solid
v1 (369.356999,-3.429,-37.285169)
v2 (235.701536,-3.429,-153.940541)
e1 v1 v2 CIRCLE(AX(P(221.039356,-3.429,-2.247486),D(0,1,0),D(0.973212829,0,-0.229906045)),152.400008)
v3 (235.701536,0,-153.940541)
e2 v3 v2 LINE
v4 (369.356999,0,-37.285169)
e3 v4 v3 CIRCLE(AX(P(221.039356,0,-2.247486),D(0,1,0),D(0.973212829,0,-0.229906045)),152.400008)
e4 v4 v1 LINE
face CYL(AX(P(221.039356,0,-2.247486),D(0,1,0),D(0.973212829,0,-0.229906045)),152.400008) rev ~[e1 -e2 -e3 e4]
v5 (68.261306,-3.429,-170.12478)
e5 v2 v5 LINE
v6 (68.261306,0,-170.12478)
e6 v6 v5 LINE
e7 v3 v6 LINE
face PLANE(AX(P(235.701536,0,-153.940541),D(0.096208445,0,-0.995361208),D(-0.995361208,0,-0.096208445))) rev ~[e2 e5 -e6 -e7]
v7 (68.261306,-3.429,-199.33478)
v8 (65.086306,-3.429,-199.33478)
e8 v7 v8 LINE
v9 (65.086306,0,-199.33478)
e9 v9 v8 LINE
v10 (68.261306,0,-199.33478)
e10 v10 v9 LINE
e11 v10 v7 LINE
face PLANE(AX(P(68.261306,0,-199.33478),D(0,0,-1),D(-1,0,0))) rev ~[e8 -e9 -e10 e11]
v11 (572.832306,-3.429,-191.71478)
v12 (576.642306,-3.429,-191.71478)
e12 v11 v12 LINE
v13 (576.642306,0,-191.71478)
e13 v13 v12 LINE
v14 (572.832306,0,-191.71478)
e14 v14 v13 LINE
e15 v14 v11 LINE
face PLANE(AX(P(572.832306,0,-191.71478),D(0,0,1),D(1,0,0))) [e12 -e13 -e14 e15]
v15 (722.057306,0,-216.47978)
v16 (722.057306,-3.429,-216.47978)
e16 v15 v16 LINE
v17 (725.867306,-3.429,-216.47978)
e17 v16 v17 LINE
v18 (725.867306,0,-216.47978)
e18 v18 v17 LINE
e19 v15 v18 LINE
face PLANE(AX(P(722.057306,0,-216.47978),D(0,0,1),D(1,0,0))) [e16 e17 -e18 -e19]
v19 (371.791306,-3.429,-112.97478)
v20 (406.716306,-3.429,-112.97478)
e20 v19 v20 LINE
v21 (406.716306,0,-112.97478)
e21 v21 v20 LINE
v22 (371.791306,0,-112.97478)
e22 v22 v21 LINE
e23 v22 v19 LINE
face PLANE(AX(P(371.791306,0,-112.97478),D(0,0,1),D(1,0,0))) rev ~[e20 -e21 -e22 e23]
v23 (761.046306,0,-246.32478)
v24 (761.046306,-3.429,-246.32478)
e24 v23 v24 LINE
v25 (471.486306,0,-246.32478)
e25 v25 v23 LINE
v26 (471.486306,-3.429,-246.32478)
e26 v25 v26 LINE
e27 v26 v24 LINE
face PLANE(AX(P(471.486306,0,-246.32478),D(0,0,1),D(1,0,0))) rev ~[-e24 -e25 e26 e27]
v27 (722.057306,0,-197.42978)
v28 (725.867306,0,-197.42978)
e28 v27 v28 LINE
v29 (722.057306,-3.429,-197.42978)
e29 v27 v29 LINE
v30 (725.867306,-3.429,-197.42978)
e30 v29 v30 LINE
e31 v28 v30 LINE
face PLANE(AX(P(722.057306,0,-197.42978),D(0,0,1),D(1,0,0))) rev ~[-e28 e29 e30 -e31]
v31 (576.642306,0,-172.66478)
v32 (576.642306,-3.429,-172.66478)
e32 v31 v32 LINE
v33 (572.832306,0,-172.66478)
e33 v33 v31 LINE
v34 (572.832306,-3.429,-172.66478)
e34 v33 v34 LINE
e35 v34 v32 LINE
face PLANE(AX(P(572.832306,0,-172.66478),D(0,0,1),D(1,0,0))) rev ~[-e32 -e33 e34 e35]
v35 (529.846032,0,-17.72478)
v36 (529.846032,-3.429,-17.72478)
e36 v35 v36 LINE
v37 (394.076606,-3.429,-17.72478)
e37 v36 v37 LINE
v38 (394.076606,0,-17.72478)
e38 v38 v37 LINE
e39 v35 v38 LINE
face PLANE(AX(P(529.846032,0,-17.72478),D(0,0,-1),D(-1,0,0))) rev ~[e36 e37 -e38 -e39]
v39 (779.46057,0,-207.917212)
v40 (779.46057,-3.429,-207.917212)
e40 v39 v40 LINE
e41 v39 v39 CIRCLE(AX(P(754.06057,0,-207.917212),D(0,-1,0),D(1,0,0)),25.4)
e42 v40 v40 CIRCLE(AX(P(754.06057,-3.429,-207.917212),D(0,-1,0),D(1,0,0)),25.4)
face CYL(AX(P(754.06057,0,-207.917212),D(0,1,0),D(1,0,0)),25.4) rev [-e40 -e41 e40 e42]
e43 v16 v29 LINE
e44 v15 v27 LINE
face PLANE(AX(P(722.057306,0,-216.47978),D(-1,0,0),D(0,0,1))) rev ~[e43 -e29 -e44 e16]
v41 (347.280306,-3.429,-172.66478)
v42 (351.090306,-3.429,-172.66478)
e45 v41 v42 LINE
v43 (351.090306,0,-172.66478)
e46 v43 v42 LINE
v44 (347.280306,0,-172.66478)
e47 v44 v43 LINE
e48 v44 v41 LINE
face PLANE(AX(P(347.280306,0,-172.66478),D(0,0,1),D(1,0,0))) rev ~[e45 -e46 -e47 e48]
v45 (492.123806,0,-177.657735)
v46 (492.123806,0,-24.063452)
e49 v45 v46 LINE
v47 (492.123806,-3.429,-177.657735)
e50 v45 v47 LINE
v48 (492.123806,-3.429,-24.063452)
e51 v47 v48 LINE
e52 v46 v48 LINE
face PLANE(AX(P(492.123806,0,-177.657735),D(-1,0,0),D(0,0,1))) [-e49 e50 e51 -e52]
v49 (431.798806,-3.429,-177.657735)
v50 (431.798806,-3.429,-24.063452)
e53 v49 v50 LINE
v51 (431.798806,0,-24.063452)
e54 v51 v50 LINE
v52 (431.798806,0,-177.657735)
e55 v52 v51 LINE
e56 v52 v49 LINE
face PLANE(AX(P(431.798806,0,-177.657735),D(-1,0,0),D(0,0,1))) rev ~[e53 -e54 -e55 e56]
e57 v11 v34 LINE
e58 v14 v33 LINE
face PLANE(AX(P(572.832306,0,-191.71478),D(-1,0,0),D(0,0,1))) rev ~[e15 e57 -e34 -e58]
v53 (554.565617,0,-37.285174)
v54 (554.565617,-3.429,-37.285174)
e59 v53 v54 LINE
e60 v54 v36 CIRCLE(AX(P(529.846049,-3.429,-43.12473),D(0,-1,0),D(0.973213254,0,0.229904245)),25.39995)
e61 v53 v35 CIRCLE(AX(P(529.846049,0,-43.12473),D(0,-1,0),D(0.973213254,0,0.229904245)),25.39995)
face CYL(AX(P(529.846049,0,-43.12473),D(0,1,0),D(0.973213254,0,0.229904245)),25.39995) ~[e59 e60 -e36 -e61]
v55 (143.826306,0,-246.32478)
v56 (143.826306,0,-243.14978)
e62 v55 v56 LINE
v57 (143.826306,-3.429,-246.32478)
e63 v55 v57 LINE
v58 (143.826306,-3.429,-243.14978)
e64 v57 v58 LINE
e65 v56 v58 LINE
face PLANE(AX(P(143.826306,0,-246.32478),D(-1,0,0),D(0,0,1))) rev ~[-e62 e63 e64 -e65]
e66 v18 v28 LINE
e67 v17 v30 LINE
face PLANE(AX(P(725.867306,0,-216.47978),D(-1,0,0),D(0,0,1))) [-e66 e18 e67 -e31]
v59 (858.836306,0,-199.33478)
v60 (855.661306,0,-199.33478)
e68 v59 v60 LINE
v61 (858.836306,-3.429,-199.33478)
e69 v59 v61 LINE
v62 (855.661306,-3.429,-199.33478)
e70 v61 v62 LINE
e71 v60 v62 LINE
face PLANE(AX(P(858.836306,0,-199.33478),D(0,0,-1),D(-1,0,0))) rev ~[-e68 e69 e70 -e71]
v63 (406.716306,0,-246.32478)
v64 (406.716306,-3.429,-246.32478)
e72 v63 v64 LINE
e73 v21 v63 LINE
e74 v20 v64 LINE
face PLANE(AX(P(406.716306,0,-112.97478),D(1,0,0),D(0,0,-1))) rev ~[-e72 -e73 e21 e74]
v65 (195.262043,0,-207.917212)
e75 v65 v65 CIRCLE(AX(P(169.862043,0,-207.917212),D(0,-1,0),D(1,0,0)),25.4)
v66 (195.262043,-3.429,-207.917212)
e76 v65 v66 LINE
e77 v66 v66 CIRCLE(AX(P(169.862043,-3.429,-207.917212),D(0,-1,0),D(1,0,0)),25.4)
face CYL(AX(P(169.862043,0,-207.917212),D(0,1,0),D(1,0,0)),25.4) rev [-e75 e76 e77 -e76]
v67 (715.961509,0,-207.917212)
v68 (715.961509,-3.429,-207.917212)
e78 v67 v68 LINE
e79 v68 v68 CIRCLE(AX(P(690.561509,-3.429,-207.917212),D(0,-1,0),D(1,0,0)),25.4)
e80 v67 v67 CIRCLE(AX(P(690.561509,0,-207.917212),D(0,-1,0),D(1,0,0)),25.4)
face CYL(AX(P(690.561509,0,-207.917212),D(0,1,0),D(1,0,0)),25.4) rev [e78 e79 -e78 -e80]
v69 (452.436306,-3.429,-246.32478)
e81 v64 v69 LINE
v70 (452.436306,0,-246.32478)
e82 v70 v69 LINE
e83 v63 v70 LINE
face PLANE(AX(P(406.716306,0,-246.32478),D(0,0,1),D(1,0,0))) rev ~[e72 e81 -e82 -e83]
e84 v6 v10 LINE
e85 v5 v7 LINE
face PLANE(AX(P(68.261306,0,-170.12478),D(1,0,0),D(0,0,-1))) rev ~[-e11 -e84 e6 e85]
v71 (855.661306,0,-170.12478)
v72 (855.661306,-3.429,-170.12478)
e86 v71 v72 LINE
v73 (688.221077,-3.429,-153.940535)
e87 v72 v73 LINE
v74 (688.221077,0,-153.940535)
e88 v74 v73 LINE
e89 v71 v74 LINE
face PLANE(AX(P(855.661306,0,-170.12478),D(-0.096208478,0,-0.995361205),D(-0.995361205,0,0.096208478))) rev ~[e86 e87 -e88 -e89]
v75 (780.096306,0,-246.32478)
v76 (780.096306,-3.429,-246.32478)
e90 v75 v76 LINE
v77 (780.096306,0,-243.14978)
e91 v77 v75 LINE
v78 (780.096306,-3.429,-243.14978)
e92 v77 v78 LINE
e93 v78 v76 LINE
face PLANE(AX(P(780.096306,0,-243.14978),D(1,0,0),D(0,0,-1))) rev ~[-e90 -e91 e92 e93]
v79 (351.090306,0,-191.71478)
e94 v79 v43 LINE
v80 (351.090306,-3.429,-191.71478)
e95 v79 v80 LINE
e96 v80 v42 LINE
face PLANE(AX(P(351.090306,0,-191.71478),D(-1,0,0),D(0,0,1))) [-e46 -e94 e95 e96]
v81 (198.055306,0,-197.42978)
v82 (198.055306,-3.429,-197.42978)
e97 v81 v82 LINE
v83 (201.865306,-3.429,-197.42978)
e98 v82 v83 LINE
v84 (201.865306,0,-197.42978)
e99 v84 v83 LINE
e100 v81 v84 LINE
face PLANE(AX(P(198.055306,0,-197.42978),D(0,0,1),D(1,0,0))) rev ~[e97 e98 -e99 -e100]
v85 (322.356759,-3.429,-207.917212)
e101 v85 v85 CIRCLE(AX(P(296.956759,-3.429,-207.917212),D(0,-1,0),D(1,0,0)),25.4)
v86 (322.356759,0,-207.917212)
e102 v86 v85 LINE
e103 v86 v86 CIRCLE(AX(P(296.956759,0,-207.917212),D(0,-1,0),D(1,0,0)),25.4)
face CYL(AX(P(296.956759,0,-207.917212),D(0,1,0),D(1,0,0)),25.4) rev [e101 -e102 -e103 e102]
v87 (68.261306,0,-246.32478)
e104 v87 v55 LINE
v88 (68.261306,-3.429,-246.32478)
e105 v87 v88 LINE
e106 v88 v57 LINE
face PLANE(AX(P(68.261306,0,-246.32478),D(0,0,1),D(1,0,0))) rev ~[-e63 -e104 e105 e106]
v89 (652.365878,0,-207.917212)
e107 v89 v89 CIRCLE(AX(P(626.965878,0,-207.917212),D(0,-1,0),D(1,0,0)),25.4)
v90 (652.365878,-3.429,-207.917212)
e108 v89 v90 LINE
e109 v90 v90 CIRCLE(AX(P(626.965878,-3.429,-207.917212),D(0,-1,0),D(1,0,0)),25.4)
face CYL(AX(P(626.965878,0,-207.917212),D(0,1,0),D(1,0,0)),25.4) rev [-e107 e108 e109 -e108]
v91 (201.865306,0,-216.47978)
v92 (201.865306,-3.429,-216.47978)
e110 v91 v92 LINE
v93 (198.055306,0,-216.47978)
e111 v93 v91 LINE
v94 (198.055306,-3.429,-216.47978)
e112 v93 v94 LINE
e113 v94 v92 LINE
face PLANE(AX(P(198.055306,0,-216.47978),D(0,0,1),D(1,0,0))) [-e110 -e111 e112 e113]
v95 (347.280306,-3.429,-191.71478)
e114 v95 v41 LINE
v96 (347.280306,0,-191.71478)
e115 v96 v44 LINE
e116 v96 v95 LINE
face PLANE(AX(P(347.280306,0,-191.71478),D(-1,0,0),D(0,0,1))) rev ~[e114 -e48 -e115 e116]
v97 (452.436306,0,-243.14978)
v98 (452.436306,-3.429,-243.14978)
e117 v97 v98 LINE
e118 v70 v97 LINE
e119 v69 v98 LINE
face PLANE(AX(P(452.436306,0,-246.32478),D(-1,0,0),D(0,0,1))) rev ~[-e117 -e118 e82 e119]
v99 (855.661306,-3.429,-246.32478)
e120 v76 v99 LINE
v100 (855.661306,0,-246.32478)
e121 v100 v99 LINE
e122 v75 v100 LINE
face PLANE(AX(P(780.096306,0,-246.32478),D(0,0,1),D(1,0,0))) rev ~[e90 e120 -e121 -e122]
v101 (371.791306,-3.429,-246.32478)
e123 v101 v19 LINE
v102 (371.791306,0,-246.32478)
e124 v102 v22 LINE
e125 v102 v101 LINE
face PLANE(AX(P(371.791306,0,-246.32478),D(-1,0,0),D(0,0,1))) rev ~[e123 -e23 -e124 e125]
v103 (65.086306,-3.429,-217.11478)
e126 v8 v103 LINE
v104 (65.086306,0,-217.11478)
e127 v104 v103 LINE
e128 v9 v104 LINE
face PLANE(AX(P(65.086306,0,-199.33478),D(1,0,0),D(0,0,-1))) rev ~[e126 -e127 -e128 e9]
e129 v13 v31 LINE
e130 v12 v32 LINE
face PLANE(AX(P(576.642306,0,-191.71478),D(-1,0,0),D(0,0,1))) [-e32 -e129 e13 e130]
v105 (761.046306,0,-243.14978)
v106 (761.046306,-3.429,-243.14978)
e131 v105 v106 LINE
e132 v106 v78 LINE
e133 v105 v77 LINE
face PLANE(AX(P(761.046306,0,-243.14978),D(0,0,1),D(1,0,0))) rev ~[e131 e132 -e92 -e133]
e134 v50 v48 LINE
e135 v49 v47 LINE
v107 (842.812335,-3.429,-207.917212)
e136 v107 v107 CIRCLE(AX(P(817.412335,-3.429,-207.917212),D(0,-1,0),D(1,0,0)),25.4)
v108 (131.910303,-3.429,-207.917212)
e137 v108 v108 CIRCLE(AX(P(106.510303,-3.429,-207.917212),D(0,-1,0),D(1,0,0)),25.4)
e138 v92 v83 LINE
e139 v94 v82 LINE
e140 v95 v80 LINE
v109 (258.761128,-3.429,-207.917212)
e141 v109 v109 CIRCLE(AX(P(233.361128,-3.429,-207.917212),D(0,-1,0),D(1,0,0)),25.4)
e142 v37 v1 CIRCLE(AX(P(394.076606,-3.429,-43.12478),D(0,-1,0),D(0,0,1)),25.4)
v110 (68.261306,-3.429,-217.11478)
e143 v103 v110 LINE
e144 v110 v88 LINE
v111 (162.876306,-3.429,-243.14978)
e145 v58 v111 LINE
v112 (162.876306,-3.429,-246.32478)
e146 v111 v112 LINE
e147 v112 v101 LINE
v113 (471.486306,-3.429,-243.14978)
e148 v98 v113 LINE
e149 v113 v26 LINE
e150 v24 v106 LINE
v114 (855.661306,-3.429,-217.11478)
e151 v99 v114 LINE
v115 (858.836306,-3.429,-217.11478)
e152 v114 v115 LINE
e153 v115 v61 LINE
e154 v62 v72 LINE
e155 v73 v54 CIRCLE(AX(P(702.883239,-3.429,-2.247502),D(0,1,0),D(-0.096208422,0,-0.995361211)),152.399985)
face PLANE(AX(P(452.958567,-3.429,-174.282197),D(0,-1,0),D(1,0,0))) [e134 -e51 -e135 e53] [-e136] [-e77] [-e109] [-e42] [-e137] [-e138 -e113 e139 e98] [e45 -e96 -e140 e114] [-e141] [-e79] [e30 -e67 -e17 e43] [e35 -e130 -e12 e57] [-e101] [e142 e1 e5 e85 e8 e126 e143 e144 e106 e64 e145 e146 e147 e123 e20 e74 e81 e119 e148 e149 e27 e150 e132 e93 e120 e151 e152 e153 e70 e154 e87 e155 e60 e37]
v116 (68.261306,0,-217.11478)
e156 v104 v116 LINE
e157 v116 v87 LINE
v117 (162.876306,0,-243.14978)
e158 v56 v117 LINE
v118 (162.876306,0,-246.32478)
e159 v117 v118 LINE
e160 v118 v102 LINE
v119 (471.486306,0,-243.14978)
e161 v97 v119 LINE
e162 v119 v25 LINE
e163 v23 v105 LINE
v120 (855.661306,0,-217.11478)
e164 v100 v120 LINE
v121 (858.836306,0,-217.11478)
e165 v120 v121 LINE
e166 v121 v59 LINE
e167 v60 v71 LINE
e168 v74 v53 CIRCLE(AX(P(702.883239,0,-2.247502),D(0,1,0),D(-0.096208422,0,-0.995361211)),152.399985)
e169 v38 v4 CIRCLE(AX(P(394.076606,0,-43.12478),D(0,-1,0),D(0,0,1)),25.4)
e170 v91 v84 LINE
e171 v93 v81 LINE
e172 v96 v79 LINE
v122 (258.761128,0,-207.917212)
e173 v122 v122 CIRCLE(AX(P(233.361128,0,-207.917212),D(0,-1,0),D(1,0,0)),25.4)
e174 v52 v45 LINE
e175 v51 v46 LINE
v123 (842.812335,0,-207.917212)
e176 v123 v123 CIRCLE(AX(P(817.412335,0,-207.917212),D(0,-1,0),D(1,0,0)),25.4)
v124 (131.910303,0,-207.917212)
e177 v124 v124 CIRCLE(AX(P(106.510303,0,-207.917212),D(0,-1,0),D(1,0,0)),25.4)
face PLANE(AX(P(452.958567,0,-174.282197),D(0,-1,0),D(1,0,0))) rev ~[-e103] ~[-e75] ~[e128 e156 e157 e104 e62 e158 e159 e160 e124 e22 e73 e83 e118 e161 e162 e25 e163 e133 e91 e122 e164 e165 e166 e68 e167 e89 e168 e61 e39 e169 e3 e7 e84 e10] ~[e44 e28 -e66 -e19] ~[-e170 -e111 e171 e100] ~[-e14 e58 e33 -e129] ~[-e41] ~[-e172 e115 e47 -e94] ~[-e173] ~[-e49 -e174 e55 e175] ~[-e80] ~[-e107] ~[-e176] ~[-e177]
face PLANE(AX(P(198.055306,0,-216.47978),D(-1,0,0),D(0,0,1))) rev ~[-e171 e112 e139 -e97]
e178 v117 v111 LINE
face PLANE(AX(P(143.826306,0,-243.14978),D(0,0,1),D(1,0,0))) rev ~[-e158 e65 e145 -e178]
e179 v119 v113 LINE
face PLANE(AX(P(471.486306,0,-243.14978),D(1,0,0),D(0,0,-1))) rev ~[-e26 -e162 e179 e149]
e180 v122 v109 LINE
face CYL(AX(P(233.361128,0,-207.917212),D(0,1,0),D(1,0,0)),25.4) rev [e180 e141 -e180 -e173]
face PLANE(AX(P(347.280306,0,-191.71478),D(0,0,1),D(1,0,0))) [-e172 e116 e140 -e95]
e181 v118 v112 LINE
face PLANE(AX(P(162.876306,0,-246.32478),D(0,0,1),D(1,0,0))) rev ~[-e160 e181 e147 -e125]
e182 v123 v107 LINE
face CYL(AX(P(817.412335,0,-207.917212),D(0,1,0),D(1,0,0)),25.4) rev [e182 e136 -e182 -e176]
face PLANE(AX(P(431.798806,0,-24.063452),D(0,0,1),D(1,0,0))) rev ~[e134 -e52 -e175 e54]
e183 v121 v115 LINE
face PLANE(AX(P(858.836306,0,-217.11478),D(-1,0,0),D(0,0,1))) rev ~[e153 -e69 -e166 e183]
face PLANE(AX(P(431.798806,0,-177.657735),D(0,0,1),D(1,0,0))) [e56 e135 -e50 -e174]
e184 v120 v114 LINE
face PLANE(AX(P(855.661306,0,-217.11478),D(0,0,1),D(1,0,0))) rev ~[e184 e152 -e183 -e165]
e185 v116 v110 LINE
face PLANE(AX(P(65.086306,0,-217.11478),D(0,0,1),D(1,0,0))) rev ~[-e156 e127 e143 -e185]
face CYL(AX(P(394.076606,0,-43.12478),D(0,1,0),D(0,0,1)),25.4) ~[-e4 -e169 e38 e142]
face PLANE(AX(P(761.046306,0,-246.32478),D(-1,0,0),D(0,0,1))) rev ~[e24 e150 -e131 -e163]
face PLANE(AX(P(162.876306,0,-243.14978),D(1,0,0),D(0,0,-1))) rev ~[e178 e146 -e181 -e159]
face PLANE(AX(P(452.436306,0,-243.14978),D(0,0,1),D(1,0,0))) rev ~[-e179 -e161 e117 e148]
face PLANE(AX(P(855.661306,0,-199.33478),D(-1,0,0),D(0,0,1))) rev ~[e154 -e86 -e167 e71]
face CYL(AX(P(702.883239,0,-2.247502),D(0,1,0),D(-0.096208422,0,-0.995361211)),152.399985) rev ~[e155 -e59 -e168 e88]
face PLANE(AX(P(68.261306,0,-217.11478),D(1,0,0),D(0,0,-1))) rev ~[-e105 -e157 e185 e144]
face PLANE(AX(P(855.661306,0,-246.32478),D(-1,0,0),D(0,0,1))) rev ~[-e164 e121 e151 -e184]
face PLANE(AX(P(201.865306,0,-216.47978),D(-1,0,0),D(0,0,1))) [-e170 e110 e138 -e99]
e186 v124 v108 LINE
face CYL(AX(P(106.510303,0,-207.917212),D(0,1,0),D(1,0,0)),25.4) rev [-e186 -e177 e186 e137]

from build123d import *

# Parameters (mm, degrees)
F0_R     = 25.4
F0_W     = 3.81
F0_H     = 19.05
F0_W_2   = 60.325
F0_H_2   = 153.5942826
F1_DEPTH = 3.429


# Not quite as in the source:
# - ends of sketch curves that miss each other by under 0.0002 mm in the source are joined


with BuildPart() as f1:
    # F0 (on Front) → F1 (new body)
    with BuildSketch(Plane.XZ):
        with BuildLine():
            Line((68.2613062, -217.1147804), (68.2613062, -246.3247804))
            Line((68.2613062, -246.3247804), (143.8263062, -246.3247804))
            Line((143.8263062, -246.3247804), (143.8263062, -243.1497804))
            Line((143.8263062, -243.1497804), (162.8763062, -243.1497804))
            Line((162.8763062, -243.1497804), (162.8763062, -246.3247804))
            Line((162.8763062, -246.3247804), (371.7913062, -246.3247804))
            Line((371.7913062, -246.3247804), (371.7913062, -112.9747804))
            Line((371.7913062, -112.9747804), (406.7163062, -112.9747804))
            Line((406.7163062, -112.9747804), (406.7163062, -246.3247804))
            Line((406.7163062, -246.3247804), (452.4363062, -246.3247804))
            Line((452.4363062, -246.3247804), (452.4363062, -243.1497804))
            Line((452.4363062, -243.1497804), (471.4863062, -243.1497804))
            Line((471.4863062, -243.1497804), (471.4863062, -246.3247804))
            Line((471.4863062, -246.3247804), (761.0463062, -246.3247804))
            Line((761.0463062, -246.3247804), (761.0463062, -243.1497804))
            Line((761.0463062, -243.1497804), (780.0963062, -243.1497804))
            Line((780.0963062, -243.1497804), (780.0963062, -246.3247804))
            Line((780.0963062, -246.3247804), (855.6613062, -246.3247804))
            Line((855.6613062, -246.3247804), (855.6613062, -217.1147804))
            Line((855.6613062, -217.1147804), (858.8363062, -217.1147804))
            Line((858.8363062, -217.1147804), (858.8363062, -199.3347804))
            Line((858.8363062, -199.3347804), (855.6613062, -199.3347804))
            Line((855.6613062, -199.3347804), (855.6613062, -170.1247804))
            Line((855.6613062, -170.1247804), (688.2210772, -153.9405354))
            ThreePointArc((688.2210772, -153.9405354), (602.6698633523, -117.0648991424), (554.5656172379, -37.2851738969))
            ThreePointArc((554.5656172379, -37.2851738969), (545.6072798598, -23.2063701747), (529.846032, -17.7247804))
            Line((529.846032, -17.7247804), (394.0766058, -17.7247804))
            ThreePointArc((394.0766058, -17.7247804), (378.3153579402, -23.2063701747), (369.3569994588, -37.2851689116))
            ThreePointArc((369.3569994588, -37.2851689116), (321.2527512475, -117.0648972224), (235.7015357309, -153.9405408928))
            Line((235.7015357309, -153.9405408928), (68.2613062, -170.1247804))
            Line((68.2613062, -170.1247804), (68.2613062, -199.3347804))
            Line((68.2613062, -199.3347804), (65.0863062, -199.3347804))
            Line((65.0863062, -199.3347804), (65.0863062, -217.1147804))
            Line((65.0863062, -217.1147804), (68.2613062, -217.1147804))
        make_face()
        with Locations((106.5103026, -207.9172118)):
            Circle(F0_R, mode=Mode.SUBTRACT)
        with Locations((169.8620428, -207.9172118)):
            Circle(F0_R, mode=Mode.SUBTRACT)
        with Locations((199.9603062, -206.9547804)):
            Rectangle(F0_W, F0_H, mode=Mode.SUBTRACT)
        with Locations((233.3611284, -207.9172118)):
            Circle(F0_R, mode=Mode.SUBTRACT)
        with Locations((296.9567594, -207.9172118)):
            Circle(F0_R, mode=Mode.SUBTRACT)
        with Locations((349.1853062, -182.1897804)):
            Rectangle(F0_W, F0_H, mode=Mode.SUBTRACT)
        with Locations((626.9658784, -207.9172118)):
            Circle(F0_R, mode=Mode.SUBTRACT)
        with Locations((690.5615094, -207.9172118)):
            Circle(F0_R, mode=Mode.SUBTRACT)
        with Locations((723.9623062, -206.9547804)):
            Rectangle(F0_W, F0_H, mode=Mode.SUBTRACT)
        with Locations((754.0605696, -207.9172118)):
            Circle(F0_R, mode=Mode.SUBTRACT)
        with Locations((817.4123352, -207.9172118)):
            Circle(F0_R, mode=Mode.SUBTRACT)
        with Locations((574.7373062, -182.1897804)):
            Rectangle(F0_W, F0_H, mode=Mode.SUBTRACT)
        with Locations((461.9613062, -100.8605933)):
            Rectangle(F0_W_2, F0_H_2, mode=Mode.SUBTRACT)
    extrude(amount=F1_DEPTH)


solid = f1.part
